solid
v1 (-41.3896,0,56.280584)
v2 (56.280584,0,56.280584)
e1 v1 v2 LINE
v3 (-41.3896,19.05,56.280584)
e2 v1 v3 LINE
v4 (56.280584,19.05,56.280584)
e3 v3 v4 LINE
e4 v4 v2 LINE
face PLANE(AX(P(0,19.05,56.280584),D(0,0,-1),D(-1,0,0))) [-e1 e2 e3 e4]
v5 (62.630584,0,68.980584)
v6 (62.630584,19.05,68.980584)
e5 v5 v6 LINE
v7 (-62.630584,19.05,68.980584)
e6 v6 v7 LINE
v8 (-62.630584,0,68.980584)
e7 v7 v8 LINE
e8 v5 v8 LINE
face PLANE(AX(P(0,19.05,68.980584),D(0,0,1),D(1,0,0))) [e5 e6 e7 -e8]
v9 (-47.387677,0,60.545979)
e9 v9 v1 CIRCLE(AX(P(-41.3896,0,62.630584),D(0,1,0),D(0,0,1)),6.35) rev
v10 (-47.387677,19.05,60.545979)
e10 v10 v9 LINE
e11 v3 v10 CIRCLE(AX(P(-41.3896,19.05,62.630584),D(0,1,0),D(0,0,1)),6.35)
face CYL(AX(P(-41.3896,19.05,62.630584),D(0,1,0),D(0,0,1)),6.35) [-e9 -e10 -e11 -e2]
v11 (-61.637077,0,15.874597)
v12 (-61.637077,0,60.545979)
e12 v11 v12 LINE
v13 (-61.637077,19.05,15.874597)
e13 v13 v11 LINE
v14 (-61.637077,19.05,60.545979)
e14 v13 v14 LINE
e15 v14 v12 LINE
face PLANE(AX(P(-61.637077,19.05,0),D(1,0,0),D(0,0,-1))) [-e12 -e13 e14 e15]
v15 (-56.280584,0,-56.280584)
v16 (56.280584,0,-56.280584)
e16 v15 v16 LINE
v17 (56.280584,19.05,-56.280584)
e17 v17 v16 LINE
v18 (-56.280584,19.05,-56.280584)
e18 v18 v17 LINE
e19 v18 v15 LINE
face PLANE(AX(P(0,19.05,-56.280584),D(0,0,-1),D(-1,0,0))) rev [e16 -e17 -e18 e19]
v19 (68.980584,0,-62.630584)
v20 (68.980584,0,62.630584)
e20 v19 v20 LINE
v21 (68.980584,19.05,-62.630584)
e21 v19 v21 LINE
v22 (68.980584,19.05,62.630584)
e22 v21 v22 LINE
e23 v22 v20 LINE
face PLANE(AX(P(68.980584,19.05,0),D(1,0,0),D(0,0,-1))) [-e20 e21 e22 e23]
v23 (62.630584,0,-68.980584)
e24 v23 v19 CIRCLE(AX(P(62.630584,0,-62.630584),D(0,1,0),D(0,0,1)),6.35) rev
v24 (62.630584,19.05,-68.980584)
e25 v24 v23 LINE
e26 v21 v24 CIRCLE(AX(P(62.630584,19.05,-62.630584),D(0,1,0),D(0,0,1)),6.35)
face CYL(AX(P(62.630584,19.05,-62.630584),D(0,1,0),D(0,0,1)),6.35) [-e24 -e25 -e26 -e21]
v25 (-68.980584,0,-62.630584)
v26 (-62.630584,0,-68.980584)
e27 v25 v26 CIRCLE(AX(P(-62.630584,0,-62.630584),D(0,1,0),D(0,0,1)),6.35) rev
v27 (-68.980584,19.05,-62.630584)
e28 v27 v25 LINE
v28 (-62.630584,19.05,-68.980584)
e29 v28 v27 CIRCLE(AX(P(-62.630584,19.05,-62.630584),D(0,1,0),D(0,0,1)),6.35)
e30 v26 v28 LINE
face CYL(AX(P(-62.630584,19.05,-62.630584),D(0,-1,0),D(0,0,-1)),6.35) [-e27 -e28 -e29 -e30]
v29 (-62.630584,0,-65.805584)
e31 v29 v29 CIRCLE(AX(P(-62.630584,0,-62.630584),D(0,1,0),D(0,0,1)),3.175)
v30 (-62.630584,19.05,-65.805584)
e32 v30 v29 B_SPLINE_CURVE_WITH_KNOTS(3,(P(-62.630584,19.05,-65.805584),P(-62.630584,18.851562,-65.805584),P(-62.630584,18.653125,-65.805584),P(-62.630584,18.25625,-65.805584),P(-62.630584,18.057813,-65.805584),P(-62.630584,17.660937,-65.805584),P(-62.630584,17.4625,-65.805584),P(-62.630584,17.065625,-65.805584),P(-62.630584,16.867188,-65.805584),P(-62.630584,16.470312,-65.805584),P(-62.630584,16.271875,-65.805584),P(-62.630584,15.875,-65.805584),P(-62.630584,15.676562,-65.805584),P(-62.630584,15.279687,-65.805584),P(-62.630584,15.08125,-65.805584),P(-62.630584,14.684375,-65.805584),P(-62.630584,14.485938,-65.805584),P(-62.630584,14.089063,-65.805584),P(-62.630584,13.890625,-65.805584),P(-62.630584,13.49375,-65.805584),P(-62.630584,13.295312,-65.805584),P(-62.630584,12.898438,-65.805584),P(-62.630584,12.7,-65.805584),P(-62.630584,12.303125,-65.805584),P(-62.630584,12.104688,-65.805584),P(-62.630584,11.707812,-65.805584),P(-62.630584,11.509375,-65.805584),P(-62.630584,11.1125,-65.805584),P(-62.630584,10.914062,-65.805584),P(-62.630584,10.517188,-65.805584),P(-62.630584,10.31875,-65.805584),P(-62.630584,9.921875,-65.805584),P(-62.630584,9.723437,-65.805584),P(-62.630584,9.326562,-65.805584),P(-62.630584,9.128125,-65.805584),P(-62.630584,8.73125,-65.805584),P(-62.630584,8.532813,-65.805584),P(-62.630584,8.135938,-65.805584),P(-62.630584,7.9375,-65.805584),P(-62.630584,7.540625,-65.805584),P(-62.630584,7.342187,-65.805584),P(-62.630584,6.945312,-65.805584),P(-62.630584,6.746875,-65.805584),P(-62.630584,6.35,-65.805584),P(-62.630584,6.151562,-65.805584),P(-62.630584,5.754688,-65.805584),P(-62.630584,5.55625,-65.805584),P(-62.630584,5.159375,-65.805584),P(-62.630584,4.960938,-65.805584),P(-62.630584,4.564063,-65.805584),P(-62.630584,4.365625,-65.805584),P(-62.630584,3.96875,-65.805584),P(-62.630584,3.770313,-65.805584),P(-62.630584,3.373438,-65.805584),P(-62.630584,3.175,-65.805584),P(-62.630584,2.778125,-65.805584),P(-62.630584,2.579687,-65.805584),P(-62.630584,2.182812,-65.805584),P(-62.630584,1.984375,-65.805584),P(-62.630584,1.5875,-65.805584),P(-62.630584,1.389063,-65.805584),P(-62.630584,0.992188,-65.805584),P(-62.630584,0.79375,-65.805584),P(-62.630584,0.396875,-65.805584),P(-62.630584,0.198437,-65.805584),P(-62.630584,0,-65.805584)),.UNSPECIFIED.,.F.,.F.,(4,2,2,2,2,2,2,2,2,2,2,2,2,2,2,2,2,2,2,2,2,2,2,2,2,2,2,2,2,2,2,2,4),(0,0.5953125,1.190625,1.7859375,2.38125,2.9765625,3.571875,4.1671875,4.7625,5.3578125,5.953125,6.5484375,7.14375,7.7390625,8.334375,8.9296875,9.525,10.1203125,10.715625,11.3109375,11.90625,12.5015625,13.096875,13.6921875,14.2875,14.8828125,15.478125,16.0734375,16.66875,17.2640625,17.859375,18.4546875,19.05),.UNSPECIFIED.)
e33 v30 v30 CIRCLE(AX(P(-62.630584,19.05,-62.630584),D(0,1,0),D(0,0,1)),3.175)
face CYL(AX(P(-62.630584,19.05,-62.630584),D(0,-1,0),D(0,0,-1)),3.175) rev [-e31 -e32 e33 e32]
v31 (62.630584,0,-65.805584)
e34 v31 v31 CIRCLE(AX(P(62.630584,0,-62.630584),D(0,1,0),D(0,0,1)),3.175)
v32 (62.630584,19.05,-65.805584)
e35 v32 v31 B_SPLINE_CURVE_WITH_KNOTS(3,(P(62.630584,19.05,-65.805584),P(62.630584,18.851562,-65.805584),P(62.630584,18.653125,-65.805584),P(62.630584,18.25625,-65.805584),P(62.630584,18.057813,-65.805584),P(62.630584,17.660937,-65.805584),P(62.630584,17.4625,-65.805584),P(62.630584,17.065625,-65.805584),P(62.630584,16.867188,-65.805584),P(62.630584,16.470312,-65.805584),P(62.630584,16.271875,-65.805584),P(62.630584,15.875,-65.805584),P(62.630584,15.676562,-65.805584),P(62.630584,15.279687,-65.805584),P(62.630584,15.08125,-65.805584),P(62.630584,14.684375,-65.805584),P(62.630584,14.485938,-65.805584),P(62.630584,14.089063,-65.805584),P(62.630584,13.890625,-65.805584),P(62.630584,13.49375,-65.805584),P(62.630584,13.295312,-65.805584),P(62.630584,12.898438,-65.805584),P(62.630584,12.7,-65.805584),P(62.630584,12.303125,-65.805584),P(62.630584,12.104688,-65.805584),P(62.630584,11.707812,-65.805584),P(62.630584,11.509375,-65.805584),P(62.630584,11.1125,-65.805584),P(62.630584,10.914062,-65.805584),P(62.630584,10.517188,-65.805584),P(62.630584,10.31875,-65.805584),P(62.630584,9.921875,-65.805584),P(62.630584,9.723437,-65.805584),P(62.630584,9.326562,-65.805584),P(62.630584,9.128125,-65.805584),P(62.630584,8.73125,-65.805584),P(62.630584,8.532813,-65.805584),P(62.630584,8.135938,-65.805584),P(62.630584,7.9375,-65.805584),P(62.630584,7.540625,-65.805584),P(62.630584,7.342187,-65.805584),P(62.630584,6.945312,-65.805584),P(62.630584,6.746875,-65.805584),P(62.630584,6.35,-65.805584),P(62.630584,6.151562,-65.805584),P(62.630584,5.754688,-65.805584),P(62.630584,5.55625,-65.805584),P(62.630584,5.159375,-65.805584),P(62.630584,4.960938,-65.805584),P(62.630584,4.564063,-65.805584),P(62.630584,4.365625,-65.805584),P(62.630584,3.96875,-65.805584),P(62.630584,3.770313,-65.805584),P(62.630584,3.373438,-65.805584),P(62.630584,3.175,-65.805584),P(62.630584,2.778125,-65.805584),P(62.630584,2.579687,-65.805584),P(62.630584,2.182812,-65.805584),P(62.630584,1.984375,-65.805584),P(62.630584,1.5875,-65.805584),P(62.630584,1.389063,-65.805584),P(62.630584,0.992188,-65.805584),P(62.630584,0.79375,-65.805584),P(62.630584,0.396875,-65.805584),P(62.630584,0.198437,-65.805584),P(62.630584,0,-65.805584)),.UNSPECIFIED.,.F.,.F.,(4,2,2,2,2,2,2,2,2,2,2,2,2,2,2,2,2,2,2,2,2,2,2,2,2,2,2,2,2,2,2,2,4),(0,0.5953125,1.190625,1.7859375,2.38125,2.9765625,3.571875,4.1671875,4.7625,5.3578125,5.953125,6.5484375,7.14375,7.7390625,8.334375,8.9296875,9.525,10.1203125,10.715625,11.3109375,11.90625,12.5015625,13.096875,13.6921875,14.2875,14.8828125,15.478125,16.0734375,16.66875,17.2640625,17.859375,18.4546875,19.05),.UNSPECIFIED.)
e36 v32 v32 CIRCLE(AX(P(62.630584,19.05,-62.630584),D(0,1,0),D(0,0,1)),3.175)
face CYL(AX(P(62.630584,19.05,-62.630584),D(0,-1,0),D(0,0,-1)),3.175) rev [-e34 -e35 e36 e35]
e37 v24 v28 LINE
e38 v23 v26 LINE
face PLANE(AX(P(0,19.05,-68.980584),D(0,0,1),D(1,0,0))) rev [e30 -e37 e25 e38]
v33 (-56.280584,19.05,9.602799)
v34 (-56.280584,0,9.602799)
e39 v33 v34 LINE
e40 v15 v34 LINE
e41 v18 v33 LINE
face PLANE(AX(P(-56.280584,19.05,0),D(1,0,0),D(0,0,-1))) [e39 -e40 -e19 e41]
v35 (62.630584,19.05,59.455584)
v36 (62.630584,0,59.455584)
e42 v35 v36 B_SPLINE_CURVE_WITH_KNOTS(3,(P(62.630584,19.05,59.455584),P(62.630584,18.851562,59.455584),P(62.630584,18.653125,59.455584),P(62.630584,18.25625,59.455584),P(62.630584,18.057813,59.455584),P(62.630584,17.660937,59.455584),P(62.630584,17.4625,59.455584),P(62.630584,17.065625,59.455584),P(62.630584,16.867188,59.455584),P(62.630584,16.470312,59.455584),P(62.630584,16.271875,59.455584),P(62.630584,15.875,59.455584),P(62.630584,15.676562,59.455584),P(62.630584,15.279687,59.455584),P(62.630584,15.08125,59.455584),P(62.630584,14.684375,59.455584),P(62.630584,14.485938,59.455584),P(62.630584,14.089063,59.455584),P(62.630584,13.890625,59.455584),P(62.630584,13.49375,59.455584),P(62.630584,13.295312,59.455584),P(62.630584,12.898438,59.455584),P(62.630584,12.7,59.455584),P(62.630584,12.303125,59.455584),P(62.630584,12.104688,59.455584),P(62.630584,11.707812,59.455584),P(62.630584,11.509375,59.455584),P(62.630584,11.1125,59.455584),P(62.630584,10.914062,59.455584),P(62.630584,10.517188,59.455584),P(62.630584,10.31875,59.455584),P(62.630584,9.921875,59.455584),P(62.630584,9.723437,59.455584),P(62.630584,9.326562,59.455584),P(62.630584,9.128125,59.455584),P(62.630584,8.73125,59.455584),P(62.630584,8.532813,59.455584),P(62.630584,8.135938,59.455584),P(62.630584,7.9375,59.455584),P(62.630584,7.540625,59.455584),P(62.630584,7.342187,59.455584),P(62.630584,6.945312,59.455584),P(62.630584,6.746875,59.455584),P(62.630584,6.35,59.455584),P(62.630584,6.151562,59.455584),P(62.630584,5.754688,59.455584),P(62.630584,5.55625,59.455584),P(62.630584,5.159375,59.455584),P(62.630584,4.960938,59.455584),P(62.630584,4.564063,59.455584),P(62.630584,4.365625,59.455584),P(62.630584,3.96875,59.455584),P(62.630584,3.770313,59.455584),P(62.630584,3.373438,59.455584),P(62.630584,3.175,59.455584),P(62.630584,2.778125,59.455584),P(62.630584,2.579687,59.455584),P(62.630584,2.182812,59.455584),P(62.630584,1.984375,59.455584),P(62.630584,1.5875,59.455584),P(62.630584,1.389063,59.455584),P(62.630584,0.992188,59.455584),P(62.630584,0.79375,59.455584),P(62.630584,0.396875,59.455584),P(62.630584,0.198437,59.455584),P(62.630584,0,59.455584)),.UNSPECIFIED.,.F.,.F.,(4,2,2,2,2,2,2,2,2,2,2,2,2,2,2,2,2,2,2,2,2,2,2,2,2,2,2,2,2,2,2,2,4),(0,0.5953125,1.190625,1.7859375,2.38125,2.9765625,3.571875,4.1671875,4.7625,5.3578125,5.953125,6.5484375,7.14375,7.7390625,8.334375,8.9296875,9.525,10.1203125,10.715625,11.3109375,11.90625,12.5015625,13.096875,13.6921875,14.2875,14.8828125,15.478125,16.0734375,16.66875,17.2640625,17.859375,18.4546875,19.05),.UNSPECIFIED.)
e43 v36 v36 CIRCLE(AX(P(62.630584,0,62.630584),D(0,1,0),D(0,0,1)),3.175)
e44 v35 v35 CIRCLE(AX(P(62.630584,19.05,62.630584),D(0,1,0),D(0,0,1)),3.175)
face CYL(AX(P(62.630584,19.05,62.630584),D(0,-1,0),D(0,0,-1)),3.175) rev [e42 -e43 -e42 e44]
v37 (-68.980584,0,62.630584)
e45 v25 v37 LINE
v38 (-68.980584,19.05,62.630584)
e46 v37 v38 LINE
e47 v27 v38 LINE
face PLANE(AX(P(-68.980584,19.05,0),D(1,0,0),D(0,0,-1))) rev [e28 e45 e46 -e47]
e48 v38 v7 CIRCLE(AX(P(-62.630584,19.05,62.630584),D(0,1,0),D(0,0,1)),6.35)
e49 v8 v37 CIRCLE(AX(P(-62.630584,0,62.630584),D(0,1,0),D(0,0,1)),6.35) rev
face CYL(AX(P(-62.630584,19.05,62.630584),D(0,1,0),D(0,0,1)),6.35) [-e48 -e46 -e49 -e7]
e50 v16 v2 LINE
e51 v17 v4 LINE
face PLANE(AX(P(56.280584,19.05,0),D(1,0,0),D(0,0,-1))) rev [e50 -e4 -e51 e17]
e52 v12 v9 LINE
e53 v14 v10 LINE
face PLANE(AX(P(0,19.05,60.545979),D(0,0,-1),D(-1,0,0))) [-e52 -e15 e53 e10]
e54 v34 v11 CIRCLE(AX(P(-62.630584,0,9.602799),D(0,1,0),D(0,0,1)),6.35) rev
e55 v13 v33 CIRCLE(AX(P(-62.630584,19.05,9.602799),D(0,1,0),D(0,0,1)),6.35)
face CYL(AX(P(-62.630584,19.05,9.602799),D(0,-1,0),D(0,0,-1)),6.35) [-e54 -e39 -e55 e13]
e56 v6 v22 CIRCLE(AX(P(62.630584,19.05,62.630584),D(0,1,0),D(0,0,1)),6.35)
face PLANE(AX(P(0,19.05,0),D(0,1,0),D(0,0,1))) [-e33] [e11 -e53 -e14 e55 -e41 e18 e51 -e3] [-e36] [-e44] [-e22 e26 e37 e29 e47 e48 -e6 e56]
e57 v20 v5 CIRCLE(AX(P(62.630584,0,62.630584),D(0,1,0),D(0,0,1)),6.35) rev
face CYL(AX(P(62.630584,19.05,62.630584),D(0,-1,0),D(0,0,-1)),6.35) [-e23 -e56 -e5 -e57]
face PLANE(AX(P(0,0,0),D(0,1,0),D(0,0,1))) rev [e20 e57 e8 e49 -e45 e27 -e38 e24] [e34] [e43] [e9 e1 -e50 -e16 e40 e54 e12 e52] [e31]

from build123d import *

# Parameters (mm, degrees)
SKETCH1_W           = 137.961167182
SKETCH1_H           = 137.961167182
SKETCH1_R           = 3.175
BOSS_EXTRUDE1_DEPTH = 19.05
FILLET1_R           = 6.35
FILLET2_R           = 6.35


with BuildPart() as part:
    # Sketch1 → Boss-Extrude1 (new body)
    with BuildSketch(Plane(origin=(0, 0, 0), x_dir=(1, 0, 0), z_dir=(0, 1, 0))):
        Rectangle(SKETCH1_W, SKETCH1_H)
        Polygon((-61.63707698, -60.545979349), (-61.63707698, -15.874596852), (-56.280583591, -15.874596852), (-56.280583591, 56.280583591), (56.280583591, 56.280583591), (56.280583591, -56.280583591), (-47.38767698, -56.280583591), (-47.38767698, -60.545979349), align=None, mode=Mode.SUBTRACT)
        with Locations(Location((62.630583591, -62.630583591, 0), (0, 0, 90))):
            Circle(SKETCH1_R, mode=Mode.SUBTRACT)
        with Locations(Location((-62.630583591, 62.630583591, 0), (0, 0, 90))):
            Circle(SKETCH1_R, mode=Mode.SUBTRACT)
        with Locations(Location((62.630583591, 62.630583591, 0), (0, 0, 90))):
            Circle(SKETCH1_R, mode=Mode.SUBTRACT)
    extrude(amount=BOSS_EXTRUDE1_DEPTH)

    # Fillet1
    fillet1_edges = [part.edges().sort_by_distance(p)[0] for p in [
        (68.980583591, 9.525, -68.980583591),
        (68.980583591, 9.525, 68.980583591),
        (-68.980583591, 9.525, 68.980583591),
        (-68.980583591, 9.525, -68.980583591),
    ]]
    fillet(fillet1_edges, radius=FILLET1_R)

    # Fillet2
    # the kernel refuses this fillet: 6.35 mm, written as the material it takes off along each edge
    with BuildSketch(Plane(origin=(-56.280583591, -15.679493896, 15.874596852), x_dir=(-1, 0, 0), z_dir=(0, 1, 0))) as fillet2_piece_1:
        with BuildLine():
            CenterArc((6.35, -6.271797558), FILLET2_R, 99.001349837, 80.998650163)
            Line((0, -6.271797558), (-0.127, -6.271797558))
            Line((-0.127, -6.271797558), (-0.127, 0))
            Line((-0.127, 0), (0, 0.127))
            ThreePointArc((0, 0.127), (2.678246694, 0.127), (5.336623257, 0.125435951))
            Line((5.336623257, 0.125435951), (5.356493389, 0))
        make_face()
    extrude(amount=50.408987792, mode=Mode.SUBTRACT)
    with BuildSketch(Plane(origin=(-47.38767698, -14.99519197, 56.280583591), x_dir=(1, 0, 0), z_dir=(0, 1, 0))) as fillet2_piece_2:
        with BuildLine():
            CenterArc((5.998076788, -6.35), FILLET2_R, 90, 70.835337627)
            Line((0, -4.265395758), (-0.119961536, -4.223703673))
            ThreePointArc((-0.119961536, -4.223703673), (-0.127, -2.132697879), (-0.127, 0))
            Line((-0.127, 0), (0, 0.127))
            Line((0, 0.127), (5.998076788, 0.127))
            Line((5.998076788, 0.127), (5.998076788, 0))
        make_face()
    extrude(amount=49.04038394, mode=Mode.SUBTRACT)


solid = part.part
